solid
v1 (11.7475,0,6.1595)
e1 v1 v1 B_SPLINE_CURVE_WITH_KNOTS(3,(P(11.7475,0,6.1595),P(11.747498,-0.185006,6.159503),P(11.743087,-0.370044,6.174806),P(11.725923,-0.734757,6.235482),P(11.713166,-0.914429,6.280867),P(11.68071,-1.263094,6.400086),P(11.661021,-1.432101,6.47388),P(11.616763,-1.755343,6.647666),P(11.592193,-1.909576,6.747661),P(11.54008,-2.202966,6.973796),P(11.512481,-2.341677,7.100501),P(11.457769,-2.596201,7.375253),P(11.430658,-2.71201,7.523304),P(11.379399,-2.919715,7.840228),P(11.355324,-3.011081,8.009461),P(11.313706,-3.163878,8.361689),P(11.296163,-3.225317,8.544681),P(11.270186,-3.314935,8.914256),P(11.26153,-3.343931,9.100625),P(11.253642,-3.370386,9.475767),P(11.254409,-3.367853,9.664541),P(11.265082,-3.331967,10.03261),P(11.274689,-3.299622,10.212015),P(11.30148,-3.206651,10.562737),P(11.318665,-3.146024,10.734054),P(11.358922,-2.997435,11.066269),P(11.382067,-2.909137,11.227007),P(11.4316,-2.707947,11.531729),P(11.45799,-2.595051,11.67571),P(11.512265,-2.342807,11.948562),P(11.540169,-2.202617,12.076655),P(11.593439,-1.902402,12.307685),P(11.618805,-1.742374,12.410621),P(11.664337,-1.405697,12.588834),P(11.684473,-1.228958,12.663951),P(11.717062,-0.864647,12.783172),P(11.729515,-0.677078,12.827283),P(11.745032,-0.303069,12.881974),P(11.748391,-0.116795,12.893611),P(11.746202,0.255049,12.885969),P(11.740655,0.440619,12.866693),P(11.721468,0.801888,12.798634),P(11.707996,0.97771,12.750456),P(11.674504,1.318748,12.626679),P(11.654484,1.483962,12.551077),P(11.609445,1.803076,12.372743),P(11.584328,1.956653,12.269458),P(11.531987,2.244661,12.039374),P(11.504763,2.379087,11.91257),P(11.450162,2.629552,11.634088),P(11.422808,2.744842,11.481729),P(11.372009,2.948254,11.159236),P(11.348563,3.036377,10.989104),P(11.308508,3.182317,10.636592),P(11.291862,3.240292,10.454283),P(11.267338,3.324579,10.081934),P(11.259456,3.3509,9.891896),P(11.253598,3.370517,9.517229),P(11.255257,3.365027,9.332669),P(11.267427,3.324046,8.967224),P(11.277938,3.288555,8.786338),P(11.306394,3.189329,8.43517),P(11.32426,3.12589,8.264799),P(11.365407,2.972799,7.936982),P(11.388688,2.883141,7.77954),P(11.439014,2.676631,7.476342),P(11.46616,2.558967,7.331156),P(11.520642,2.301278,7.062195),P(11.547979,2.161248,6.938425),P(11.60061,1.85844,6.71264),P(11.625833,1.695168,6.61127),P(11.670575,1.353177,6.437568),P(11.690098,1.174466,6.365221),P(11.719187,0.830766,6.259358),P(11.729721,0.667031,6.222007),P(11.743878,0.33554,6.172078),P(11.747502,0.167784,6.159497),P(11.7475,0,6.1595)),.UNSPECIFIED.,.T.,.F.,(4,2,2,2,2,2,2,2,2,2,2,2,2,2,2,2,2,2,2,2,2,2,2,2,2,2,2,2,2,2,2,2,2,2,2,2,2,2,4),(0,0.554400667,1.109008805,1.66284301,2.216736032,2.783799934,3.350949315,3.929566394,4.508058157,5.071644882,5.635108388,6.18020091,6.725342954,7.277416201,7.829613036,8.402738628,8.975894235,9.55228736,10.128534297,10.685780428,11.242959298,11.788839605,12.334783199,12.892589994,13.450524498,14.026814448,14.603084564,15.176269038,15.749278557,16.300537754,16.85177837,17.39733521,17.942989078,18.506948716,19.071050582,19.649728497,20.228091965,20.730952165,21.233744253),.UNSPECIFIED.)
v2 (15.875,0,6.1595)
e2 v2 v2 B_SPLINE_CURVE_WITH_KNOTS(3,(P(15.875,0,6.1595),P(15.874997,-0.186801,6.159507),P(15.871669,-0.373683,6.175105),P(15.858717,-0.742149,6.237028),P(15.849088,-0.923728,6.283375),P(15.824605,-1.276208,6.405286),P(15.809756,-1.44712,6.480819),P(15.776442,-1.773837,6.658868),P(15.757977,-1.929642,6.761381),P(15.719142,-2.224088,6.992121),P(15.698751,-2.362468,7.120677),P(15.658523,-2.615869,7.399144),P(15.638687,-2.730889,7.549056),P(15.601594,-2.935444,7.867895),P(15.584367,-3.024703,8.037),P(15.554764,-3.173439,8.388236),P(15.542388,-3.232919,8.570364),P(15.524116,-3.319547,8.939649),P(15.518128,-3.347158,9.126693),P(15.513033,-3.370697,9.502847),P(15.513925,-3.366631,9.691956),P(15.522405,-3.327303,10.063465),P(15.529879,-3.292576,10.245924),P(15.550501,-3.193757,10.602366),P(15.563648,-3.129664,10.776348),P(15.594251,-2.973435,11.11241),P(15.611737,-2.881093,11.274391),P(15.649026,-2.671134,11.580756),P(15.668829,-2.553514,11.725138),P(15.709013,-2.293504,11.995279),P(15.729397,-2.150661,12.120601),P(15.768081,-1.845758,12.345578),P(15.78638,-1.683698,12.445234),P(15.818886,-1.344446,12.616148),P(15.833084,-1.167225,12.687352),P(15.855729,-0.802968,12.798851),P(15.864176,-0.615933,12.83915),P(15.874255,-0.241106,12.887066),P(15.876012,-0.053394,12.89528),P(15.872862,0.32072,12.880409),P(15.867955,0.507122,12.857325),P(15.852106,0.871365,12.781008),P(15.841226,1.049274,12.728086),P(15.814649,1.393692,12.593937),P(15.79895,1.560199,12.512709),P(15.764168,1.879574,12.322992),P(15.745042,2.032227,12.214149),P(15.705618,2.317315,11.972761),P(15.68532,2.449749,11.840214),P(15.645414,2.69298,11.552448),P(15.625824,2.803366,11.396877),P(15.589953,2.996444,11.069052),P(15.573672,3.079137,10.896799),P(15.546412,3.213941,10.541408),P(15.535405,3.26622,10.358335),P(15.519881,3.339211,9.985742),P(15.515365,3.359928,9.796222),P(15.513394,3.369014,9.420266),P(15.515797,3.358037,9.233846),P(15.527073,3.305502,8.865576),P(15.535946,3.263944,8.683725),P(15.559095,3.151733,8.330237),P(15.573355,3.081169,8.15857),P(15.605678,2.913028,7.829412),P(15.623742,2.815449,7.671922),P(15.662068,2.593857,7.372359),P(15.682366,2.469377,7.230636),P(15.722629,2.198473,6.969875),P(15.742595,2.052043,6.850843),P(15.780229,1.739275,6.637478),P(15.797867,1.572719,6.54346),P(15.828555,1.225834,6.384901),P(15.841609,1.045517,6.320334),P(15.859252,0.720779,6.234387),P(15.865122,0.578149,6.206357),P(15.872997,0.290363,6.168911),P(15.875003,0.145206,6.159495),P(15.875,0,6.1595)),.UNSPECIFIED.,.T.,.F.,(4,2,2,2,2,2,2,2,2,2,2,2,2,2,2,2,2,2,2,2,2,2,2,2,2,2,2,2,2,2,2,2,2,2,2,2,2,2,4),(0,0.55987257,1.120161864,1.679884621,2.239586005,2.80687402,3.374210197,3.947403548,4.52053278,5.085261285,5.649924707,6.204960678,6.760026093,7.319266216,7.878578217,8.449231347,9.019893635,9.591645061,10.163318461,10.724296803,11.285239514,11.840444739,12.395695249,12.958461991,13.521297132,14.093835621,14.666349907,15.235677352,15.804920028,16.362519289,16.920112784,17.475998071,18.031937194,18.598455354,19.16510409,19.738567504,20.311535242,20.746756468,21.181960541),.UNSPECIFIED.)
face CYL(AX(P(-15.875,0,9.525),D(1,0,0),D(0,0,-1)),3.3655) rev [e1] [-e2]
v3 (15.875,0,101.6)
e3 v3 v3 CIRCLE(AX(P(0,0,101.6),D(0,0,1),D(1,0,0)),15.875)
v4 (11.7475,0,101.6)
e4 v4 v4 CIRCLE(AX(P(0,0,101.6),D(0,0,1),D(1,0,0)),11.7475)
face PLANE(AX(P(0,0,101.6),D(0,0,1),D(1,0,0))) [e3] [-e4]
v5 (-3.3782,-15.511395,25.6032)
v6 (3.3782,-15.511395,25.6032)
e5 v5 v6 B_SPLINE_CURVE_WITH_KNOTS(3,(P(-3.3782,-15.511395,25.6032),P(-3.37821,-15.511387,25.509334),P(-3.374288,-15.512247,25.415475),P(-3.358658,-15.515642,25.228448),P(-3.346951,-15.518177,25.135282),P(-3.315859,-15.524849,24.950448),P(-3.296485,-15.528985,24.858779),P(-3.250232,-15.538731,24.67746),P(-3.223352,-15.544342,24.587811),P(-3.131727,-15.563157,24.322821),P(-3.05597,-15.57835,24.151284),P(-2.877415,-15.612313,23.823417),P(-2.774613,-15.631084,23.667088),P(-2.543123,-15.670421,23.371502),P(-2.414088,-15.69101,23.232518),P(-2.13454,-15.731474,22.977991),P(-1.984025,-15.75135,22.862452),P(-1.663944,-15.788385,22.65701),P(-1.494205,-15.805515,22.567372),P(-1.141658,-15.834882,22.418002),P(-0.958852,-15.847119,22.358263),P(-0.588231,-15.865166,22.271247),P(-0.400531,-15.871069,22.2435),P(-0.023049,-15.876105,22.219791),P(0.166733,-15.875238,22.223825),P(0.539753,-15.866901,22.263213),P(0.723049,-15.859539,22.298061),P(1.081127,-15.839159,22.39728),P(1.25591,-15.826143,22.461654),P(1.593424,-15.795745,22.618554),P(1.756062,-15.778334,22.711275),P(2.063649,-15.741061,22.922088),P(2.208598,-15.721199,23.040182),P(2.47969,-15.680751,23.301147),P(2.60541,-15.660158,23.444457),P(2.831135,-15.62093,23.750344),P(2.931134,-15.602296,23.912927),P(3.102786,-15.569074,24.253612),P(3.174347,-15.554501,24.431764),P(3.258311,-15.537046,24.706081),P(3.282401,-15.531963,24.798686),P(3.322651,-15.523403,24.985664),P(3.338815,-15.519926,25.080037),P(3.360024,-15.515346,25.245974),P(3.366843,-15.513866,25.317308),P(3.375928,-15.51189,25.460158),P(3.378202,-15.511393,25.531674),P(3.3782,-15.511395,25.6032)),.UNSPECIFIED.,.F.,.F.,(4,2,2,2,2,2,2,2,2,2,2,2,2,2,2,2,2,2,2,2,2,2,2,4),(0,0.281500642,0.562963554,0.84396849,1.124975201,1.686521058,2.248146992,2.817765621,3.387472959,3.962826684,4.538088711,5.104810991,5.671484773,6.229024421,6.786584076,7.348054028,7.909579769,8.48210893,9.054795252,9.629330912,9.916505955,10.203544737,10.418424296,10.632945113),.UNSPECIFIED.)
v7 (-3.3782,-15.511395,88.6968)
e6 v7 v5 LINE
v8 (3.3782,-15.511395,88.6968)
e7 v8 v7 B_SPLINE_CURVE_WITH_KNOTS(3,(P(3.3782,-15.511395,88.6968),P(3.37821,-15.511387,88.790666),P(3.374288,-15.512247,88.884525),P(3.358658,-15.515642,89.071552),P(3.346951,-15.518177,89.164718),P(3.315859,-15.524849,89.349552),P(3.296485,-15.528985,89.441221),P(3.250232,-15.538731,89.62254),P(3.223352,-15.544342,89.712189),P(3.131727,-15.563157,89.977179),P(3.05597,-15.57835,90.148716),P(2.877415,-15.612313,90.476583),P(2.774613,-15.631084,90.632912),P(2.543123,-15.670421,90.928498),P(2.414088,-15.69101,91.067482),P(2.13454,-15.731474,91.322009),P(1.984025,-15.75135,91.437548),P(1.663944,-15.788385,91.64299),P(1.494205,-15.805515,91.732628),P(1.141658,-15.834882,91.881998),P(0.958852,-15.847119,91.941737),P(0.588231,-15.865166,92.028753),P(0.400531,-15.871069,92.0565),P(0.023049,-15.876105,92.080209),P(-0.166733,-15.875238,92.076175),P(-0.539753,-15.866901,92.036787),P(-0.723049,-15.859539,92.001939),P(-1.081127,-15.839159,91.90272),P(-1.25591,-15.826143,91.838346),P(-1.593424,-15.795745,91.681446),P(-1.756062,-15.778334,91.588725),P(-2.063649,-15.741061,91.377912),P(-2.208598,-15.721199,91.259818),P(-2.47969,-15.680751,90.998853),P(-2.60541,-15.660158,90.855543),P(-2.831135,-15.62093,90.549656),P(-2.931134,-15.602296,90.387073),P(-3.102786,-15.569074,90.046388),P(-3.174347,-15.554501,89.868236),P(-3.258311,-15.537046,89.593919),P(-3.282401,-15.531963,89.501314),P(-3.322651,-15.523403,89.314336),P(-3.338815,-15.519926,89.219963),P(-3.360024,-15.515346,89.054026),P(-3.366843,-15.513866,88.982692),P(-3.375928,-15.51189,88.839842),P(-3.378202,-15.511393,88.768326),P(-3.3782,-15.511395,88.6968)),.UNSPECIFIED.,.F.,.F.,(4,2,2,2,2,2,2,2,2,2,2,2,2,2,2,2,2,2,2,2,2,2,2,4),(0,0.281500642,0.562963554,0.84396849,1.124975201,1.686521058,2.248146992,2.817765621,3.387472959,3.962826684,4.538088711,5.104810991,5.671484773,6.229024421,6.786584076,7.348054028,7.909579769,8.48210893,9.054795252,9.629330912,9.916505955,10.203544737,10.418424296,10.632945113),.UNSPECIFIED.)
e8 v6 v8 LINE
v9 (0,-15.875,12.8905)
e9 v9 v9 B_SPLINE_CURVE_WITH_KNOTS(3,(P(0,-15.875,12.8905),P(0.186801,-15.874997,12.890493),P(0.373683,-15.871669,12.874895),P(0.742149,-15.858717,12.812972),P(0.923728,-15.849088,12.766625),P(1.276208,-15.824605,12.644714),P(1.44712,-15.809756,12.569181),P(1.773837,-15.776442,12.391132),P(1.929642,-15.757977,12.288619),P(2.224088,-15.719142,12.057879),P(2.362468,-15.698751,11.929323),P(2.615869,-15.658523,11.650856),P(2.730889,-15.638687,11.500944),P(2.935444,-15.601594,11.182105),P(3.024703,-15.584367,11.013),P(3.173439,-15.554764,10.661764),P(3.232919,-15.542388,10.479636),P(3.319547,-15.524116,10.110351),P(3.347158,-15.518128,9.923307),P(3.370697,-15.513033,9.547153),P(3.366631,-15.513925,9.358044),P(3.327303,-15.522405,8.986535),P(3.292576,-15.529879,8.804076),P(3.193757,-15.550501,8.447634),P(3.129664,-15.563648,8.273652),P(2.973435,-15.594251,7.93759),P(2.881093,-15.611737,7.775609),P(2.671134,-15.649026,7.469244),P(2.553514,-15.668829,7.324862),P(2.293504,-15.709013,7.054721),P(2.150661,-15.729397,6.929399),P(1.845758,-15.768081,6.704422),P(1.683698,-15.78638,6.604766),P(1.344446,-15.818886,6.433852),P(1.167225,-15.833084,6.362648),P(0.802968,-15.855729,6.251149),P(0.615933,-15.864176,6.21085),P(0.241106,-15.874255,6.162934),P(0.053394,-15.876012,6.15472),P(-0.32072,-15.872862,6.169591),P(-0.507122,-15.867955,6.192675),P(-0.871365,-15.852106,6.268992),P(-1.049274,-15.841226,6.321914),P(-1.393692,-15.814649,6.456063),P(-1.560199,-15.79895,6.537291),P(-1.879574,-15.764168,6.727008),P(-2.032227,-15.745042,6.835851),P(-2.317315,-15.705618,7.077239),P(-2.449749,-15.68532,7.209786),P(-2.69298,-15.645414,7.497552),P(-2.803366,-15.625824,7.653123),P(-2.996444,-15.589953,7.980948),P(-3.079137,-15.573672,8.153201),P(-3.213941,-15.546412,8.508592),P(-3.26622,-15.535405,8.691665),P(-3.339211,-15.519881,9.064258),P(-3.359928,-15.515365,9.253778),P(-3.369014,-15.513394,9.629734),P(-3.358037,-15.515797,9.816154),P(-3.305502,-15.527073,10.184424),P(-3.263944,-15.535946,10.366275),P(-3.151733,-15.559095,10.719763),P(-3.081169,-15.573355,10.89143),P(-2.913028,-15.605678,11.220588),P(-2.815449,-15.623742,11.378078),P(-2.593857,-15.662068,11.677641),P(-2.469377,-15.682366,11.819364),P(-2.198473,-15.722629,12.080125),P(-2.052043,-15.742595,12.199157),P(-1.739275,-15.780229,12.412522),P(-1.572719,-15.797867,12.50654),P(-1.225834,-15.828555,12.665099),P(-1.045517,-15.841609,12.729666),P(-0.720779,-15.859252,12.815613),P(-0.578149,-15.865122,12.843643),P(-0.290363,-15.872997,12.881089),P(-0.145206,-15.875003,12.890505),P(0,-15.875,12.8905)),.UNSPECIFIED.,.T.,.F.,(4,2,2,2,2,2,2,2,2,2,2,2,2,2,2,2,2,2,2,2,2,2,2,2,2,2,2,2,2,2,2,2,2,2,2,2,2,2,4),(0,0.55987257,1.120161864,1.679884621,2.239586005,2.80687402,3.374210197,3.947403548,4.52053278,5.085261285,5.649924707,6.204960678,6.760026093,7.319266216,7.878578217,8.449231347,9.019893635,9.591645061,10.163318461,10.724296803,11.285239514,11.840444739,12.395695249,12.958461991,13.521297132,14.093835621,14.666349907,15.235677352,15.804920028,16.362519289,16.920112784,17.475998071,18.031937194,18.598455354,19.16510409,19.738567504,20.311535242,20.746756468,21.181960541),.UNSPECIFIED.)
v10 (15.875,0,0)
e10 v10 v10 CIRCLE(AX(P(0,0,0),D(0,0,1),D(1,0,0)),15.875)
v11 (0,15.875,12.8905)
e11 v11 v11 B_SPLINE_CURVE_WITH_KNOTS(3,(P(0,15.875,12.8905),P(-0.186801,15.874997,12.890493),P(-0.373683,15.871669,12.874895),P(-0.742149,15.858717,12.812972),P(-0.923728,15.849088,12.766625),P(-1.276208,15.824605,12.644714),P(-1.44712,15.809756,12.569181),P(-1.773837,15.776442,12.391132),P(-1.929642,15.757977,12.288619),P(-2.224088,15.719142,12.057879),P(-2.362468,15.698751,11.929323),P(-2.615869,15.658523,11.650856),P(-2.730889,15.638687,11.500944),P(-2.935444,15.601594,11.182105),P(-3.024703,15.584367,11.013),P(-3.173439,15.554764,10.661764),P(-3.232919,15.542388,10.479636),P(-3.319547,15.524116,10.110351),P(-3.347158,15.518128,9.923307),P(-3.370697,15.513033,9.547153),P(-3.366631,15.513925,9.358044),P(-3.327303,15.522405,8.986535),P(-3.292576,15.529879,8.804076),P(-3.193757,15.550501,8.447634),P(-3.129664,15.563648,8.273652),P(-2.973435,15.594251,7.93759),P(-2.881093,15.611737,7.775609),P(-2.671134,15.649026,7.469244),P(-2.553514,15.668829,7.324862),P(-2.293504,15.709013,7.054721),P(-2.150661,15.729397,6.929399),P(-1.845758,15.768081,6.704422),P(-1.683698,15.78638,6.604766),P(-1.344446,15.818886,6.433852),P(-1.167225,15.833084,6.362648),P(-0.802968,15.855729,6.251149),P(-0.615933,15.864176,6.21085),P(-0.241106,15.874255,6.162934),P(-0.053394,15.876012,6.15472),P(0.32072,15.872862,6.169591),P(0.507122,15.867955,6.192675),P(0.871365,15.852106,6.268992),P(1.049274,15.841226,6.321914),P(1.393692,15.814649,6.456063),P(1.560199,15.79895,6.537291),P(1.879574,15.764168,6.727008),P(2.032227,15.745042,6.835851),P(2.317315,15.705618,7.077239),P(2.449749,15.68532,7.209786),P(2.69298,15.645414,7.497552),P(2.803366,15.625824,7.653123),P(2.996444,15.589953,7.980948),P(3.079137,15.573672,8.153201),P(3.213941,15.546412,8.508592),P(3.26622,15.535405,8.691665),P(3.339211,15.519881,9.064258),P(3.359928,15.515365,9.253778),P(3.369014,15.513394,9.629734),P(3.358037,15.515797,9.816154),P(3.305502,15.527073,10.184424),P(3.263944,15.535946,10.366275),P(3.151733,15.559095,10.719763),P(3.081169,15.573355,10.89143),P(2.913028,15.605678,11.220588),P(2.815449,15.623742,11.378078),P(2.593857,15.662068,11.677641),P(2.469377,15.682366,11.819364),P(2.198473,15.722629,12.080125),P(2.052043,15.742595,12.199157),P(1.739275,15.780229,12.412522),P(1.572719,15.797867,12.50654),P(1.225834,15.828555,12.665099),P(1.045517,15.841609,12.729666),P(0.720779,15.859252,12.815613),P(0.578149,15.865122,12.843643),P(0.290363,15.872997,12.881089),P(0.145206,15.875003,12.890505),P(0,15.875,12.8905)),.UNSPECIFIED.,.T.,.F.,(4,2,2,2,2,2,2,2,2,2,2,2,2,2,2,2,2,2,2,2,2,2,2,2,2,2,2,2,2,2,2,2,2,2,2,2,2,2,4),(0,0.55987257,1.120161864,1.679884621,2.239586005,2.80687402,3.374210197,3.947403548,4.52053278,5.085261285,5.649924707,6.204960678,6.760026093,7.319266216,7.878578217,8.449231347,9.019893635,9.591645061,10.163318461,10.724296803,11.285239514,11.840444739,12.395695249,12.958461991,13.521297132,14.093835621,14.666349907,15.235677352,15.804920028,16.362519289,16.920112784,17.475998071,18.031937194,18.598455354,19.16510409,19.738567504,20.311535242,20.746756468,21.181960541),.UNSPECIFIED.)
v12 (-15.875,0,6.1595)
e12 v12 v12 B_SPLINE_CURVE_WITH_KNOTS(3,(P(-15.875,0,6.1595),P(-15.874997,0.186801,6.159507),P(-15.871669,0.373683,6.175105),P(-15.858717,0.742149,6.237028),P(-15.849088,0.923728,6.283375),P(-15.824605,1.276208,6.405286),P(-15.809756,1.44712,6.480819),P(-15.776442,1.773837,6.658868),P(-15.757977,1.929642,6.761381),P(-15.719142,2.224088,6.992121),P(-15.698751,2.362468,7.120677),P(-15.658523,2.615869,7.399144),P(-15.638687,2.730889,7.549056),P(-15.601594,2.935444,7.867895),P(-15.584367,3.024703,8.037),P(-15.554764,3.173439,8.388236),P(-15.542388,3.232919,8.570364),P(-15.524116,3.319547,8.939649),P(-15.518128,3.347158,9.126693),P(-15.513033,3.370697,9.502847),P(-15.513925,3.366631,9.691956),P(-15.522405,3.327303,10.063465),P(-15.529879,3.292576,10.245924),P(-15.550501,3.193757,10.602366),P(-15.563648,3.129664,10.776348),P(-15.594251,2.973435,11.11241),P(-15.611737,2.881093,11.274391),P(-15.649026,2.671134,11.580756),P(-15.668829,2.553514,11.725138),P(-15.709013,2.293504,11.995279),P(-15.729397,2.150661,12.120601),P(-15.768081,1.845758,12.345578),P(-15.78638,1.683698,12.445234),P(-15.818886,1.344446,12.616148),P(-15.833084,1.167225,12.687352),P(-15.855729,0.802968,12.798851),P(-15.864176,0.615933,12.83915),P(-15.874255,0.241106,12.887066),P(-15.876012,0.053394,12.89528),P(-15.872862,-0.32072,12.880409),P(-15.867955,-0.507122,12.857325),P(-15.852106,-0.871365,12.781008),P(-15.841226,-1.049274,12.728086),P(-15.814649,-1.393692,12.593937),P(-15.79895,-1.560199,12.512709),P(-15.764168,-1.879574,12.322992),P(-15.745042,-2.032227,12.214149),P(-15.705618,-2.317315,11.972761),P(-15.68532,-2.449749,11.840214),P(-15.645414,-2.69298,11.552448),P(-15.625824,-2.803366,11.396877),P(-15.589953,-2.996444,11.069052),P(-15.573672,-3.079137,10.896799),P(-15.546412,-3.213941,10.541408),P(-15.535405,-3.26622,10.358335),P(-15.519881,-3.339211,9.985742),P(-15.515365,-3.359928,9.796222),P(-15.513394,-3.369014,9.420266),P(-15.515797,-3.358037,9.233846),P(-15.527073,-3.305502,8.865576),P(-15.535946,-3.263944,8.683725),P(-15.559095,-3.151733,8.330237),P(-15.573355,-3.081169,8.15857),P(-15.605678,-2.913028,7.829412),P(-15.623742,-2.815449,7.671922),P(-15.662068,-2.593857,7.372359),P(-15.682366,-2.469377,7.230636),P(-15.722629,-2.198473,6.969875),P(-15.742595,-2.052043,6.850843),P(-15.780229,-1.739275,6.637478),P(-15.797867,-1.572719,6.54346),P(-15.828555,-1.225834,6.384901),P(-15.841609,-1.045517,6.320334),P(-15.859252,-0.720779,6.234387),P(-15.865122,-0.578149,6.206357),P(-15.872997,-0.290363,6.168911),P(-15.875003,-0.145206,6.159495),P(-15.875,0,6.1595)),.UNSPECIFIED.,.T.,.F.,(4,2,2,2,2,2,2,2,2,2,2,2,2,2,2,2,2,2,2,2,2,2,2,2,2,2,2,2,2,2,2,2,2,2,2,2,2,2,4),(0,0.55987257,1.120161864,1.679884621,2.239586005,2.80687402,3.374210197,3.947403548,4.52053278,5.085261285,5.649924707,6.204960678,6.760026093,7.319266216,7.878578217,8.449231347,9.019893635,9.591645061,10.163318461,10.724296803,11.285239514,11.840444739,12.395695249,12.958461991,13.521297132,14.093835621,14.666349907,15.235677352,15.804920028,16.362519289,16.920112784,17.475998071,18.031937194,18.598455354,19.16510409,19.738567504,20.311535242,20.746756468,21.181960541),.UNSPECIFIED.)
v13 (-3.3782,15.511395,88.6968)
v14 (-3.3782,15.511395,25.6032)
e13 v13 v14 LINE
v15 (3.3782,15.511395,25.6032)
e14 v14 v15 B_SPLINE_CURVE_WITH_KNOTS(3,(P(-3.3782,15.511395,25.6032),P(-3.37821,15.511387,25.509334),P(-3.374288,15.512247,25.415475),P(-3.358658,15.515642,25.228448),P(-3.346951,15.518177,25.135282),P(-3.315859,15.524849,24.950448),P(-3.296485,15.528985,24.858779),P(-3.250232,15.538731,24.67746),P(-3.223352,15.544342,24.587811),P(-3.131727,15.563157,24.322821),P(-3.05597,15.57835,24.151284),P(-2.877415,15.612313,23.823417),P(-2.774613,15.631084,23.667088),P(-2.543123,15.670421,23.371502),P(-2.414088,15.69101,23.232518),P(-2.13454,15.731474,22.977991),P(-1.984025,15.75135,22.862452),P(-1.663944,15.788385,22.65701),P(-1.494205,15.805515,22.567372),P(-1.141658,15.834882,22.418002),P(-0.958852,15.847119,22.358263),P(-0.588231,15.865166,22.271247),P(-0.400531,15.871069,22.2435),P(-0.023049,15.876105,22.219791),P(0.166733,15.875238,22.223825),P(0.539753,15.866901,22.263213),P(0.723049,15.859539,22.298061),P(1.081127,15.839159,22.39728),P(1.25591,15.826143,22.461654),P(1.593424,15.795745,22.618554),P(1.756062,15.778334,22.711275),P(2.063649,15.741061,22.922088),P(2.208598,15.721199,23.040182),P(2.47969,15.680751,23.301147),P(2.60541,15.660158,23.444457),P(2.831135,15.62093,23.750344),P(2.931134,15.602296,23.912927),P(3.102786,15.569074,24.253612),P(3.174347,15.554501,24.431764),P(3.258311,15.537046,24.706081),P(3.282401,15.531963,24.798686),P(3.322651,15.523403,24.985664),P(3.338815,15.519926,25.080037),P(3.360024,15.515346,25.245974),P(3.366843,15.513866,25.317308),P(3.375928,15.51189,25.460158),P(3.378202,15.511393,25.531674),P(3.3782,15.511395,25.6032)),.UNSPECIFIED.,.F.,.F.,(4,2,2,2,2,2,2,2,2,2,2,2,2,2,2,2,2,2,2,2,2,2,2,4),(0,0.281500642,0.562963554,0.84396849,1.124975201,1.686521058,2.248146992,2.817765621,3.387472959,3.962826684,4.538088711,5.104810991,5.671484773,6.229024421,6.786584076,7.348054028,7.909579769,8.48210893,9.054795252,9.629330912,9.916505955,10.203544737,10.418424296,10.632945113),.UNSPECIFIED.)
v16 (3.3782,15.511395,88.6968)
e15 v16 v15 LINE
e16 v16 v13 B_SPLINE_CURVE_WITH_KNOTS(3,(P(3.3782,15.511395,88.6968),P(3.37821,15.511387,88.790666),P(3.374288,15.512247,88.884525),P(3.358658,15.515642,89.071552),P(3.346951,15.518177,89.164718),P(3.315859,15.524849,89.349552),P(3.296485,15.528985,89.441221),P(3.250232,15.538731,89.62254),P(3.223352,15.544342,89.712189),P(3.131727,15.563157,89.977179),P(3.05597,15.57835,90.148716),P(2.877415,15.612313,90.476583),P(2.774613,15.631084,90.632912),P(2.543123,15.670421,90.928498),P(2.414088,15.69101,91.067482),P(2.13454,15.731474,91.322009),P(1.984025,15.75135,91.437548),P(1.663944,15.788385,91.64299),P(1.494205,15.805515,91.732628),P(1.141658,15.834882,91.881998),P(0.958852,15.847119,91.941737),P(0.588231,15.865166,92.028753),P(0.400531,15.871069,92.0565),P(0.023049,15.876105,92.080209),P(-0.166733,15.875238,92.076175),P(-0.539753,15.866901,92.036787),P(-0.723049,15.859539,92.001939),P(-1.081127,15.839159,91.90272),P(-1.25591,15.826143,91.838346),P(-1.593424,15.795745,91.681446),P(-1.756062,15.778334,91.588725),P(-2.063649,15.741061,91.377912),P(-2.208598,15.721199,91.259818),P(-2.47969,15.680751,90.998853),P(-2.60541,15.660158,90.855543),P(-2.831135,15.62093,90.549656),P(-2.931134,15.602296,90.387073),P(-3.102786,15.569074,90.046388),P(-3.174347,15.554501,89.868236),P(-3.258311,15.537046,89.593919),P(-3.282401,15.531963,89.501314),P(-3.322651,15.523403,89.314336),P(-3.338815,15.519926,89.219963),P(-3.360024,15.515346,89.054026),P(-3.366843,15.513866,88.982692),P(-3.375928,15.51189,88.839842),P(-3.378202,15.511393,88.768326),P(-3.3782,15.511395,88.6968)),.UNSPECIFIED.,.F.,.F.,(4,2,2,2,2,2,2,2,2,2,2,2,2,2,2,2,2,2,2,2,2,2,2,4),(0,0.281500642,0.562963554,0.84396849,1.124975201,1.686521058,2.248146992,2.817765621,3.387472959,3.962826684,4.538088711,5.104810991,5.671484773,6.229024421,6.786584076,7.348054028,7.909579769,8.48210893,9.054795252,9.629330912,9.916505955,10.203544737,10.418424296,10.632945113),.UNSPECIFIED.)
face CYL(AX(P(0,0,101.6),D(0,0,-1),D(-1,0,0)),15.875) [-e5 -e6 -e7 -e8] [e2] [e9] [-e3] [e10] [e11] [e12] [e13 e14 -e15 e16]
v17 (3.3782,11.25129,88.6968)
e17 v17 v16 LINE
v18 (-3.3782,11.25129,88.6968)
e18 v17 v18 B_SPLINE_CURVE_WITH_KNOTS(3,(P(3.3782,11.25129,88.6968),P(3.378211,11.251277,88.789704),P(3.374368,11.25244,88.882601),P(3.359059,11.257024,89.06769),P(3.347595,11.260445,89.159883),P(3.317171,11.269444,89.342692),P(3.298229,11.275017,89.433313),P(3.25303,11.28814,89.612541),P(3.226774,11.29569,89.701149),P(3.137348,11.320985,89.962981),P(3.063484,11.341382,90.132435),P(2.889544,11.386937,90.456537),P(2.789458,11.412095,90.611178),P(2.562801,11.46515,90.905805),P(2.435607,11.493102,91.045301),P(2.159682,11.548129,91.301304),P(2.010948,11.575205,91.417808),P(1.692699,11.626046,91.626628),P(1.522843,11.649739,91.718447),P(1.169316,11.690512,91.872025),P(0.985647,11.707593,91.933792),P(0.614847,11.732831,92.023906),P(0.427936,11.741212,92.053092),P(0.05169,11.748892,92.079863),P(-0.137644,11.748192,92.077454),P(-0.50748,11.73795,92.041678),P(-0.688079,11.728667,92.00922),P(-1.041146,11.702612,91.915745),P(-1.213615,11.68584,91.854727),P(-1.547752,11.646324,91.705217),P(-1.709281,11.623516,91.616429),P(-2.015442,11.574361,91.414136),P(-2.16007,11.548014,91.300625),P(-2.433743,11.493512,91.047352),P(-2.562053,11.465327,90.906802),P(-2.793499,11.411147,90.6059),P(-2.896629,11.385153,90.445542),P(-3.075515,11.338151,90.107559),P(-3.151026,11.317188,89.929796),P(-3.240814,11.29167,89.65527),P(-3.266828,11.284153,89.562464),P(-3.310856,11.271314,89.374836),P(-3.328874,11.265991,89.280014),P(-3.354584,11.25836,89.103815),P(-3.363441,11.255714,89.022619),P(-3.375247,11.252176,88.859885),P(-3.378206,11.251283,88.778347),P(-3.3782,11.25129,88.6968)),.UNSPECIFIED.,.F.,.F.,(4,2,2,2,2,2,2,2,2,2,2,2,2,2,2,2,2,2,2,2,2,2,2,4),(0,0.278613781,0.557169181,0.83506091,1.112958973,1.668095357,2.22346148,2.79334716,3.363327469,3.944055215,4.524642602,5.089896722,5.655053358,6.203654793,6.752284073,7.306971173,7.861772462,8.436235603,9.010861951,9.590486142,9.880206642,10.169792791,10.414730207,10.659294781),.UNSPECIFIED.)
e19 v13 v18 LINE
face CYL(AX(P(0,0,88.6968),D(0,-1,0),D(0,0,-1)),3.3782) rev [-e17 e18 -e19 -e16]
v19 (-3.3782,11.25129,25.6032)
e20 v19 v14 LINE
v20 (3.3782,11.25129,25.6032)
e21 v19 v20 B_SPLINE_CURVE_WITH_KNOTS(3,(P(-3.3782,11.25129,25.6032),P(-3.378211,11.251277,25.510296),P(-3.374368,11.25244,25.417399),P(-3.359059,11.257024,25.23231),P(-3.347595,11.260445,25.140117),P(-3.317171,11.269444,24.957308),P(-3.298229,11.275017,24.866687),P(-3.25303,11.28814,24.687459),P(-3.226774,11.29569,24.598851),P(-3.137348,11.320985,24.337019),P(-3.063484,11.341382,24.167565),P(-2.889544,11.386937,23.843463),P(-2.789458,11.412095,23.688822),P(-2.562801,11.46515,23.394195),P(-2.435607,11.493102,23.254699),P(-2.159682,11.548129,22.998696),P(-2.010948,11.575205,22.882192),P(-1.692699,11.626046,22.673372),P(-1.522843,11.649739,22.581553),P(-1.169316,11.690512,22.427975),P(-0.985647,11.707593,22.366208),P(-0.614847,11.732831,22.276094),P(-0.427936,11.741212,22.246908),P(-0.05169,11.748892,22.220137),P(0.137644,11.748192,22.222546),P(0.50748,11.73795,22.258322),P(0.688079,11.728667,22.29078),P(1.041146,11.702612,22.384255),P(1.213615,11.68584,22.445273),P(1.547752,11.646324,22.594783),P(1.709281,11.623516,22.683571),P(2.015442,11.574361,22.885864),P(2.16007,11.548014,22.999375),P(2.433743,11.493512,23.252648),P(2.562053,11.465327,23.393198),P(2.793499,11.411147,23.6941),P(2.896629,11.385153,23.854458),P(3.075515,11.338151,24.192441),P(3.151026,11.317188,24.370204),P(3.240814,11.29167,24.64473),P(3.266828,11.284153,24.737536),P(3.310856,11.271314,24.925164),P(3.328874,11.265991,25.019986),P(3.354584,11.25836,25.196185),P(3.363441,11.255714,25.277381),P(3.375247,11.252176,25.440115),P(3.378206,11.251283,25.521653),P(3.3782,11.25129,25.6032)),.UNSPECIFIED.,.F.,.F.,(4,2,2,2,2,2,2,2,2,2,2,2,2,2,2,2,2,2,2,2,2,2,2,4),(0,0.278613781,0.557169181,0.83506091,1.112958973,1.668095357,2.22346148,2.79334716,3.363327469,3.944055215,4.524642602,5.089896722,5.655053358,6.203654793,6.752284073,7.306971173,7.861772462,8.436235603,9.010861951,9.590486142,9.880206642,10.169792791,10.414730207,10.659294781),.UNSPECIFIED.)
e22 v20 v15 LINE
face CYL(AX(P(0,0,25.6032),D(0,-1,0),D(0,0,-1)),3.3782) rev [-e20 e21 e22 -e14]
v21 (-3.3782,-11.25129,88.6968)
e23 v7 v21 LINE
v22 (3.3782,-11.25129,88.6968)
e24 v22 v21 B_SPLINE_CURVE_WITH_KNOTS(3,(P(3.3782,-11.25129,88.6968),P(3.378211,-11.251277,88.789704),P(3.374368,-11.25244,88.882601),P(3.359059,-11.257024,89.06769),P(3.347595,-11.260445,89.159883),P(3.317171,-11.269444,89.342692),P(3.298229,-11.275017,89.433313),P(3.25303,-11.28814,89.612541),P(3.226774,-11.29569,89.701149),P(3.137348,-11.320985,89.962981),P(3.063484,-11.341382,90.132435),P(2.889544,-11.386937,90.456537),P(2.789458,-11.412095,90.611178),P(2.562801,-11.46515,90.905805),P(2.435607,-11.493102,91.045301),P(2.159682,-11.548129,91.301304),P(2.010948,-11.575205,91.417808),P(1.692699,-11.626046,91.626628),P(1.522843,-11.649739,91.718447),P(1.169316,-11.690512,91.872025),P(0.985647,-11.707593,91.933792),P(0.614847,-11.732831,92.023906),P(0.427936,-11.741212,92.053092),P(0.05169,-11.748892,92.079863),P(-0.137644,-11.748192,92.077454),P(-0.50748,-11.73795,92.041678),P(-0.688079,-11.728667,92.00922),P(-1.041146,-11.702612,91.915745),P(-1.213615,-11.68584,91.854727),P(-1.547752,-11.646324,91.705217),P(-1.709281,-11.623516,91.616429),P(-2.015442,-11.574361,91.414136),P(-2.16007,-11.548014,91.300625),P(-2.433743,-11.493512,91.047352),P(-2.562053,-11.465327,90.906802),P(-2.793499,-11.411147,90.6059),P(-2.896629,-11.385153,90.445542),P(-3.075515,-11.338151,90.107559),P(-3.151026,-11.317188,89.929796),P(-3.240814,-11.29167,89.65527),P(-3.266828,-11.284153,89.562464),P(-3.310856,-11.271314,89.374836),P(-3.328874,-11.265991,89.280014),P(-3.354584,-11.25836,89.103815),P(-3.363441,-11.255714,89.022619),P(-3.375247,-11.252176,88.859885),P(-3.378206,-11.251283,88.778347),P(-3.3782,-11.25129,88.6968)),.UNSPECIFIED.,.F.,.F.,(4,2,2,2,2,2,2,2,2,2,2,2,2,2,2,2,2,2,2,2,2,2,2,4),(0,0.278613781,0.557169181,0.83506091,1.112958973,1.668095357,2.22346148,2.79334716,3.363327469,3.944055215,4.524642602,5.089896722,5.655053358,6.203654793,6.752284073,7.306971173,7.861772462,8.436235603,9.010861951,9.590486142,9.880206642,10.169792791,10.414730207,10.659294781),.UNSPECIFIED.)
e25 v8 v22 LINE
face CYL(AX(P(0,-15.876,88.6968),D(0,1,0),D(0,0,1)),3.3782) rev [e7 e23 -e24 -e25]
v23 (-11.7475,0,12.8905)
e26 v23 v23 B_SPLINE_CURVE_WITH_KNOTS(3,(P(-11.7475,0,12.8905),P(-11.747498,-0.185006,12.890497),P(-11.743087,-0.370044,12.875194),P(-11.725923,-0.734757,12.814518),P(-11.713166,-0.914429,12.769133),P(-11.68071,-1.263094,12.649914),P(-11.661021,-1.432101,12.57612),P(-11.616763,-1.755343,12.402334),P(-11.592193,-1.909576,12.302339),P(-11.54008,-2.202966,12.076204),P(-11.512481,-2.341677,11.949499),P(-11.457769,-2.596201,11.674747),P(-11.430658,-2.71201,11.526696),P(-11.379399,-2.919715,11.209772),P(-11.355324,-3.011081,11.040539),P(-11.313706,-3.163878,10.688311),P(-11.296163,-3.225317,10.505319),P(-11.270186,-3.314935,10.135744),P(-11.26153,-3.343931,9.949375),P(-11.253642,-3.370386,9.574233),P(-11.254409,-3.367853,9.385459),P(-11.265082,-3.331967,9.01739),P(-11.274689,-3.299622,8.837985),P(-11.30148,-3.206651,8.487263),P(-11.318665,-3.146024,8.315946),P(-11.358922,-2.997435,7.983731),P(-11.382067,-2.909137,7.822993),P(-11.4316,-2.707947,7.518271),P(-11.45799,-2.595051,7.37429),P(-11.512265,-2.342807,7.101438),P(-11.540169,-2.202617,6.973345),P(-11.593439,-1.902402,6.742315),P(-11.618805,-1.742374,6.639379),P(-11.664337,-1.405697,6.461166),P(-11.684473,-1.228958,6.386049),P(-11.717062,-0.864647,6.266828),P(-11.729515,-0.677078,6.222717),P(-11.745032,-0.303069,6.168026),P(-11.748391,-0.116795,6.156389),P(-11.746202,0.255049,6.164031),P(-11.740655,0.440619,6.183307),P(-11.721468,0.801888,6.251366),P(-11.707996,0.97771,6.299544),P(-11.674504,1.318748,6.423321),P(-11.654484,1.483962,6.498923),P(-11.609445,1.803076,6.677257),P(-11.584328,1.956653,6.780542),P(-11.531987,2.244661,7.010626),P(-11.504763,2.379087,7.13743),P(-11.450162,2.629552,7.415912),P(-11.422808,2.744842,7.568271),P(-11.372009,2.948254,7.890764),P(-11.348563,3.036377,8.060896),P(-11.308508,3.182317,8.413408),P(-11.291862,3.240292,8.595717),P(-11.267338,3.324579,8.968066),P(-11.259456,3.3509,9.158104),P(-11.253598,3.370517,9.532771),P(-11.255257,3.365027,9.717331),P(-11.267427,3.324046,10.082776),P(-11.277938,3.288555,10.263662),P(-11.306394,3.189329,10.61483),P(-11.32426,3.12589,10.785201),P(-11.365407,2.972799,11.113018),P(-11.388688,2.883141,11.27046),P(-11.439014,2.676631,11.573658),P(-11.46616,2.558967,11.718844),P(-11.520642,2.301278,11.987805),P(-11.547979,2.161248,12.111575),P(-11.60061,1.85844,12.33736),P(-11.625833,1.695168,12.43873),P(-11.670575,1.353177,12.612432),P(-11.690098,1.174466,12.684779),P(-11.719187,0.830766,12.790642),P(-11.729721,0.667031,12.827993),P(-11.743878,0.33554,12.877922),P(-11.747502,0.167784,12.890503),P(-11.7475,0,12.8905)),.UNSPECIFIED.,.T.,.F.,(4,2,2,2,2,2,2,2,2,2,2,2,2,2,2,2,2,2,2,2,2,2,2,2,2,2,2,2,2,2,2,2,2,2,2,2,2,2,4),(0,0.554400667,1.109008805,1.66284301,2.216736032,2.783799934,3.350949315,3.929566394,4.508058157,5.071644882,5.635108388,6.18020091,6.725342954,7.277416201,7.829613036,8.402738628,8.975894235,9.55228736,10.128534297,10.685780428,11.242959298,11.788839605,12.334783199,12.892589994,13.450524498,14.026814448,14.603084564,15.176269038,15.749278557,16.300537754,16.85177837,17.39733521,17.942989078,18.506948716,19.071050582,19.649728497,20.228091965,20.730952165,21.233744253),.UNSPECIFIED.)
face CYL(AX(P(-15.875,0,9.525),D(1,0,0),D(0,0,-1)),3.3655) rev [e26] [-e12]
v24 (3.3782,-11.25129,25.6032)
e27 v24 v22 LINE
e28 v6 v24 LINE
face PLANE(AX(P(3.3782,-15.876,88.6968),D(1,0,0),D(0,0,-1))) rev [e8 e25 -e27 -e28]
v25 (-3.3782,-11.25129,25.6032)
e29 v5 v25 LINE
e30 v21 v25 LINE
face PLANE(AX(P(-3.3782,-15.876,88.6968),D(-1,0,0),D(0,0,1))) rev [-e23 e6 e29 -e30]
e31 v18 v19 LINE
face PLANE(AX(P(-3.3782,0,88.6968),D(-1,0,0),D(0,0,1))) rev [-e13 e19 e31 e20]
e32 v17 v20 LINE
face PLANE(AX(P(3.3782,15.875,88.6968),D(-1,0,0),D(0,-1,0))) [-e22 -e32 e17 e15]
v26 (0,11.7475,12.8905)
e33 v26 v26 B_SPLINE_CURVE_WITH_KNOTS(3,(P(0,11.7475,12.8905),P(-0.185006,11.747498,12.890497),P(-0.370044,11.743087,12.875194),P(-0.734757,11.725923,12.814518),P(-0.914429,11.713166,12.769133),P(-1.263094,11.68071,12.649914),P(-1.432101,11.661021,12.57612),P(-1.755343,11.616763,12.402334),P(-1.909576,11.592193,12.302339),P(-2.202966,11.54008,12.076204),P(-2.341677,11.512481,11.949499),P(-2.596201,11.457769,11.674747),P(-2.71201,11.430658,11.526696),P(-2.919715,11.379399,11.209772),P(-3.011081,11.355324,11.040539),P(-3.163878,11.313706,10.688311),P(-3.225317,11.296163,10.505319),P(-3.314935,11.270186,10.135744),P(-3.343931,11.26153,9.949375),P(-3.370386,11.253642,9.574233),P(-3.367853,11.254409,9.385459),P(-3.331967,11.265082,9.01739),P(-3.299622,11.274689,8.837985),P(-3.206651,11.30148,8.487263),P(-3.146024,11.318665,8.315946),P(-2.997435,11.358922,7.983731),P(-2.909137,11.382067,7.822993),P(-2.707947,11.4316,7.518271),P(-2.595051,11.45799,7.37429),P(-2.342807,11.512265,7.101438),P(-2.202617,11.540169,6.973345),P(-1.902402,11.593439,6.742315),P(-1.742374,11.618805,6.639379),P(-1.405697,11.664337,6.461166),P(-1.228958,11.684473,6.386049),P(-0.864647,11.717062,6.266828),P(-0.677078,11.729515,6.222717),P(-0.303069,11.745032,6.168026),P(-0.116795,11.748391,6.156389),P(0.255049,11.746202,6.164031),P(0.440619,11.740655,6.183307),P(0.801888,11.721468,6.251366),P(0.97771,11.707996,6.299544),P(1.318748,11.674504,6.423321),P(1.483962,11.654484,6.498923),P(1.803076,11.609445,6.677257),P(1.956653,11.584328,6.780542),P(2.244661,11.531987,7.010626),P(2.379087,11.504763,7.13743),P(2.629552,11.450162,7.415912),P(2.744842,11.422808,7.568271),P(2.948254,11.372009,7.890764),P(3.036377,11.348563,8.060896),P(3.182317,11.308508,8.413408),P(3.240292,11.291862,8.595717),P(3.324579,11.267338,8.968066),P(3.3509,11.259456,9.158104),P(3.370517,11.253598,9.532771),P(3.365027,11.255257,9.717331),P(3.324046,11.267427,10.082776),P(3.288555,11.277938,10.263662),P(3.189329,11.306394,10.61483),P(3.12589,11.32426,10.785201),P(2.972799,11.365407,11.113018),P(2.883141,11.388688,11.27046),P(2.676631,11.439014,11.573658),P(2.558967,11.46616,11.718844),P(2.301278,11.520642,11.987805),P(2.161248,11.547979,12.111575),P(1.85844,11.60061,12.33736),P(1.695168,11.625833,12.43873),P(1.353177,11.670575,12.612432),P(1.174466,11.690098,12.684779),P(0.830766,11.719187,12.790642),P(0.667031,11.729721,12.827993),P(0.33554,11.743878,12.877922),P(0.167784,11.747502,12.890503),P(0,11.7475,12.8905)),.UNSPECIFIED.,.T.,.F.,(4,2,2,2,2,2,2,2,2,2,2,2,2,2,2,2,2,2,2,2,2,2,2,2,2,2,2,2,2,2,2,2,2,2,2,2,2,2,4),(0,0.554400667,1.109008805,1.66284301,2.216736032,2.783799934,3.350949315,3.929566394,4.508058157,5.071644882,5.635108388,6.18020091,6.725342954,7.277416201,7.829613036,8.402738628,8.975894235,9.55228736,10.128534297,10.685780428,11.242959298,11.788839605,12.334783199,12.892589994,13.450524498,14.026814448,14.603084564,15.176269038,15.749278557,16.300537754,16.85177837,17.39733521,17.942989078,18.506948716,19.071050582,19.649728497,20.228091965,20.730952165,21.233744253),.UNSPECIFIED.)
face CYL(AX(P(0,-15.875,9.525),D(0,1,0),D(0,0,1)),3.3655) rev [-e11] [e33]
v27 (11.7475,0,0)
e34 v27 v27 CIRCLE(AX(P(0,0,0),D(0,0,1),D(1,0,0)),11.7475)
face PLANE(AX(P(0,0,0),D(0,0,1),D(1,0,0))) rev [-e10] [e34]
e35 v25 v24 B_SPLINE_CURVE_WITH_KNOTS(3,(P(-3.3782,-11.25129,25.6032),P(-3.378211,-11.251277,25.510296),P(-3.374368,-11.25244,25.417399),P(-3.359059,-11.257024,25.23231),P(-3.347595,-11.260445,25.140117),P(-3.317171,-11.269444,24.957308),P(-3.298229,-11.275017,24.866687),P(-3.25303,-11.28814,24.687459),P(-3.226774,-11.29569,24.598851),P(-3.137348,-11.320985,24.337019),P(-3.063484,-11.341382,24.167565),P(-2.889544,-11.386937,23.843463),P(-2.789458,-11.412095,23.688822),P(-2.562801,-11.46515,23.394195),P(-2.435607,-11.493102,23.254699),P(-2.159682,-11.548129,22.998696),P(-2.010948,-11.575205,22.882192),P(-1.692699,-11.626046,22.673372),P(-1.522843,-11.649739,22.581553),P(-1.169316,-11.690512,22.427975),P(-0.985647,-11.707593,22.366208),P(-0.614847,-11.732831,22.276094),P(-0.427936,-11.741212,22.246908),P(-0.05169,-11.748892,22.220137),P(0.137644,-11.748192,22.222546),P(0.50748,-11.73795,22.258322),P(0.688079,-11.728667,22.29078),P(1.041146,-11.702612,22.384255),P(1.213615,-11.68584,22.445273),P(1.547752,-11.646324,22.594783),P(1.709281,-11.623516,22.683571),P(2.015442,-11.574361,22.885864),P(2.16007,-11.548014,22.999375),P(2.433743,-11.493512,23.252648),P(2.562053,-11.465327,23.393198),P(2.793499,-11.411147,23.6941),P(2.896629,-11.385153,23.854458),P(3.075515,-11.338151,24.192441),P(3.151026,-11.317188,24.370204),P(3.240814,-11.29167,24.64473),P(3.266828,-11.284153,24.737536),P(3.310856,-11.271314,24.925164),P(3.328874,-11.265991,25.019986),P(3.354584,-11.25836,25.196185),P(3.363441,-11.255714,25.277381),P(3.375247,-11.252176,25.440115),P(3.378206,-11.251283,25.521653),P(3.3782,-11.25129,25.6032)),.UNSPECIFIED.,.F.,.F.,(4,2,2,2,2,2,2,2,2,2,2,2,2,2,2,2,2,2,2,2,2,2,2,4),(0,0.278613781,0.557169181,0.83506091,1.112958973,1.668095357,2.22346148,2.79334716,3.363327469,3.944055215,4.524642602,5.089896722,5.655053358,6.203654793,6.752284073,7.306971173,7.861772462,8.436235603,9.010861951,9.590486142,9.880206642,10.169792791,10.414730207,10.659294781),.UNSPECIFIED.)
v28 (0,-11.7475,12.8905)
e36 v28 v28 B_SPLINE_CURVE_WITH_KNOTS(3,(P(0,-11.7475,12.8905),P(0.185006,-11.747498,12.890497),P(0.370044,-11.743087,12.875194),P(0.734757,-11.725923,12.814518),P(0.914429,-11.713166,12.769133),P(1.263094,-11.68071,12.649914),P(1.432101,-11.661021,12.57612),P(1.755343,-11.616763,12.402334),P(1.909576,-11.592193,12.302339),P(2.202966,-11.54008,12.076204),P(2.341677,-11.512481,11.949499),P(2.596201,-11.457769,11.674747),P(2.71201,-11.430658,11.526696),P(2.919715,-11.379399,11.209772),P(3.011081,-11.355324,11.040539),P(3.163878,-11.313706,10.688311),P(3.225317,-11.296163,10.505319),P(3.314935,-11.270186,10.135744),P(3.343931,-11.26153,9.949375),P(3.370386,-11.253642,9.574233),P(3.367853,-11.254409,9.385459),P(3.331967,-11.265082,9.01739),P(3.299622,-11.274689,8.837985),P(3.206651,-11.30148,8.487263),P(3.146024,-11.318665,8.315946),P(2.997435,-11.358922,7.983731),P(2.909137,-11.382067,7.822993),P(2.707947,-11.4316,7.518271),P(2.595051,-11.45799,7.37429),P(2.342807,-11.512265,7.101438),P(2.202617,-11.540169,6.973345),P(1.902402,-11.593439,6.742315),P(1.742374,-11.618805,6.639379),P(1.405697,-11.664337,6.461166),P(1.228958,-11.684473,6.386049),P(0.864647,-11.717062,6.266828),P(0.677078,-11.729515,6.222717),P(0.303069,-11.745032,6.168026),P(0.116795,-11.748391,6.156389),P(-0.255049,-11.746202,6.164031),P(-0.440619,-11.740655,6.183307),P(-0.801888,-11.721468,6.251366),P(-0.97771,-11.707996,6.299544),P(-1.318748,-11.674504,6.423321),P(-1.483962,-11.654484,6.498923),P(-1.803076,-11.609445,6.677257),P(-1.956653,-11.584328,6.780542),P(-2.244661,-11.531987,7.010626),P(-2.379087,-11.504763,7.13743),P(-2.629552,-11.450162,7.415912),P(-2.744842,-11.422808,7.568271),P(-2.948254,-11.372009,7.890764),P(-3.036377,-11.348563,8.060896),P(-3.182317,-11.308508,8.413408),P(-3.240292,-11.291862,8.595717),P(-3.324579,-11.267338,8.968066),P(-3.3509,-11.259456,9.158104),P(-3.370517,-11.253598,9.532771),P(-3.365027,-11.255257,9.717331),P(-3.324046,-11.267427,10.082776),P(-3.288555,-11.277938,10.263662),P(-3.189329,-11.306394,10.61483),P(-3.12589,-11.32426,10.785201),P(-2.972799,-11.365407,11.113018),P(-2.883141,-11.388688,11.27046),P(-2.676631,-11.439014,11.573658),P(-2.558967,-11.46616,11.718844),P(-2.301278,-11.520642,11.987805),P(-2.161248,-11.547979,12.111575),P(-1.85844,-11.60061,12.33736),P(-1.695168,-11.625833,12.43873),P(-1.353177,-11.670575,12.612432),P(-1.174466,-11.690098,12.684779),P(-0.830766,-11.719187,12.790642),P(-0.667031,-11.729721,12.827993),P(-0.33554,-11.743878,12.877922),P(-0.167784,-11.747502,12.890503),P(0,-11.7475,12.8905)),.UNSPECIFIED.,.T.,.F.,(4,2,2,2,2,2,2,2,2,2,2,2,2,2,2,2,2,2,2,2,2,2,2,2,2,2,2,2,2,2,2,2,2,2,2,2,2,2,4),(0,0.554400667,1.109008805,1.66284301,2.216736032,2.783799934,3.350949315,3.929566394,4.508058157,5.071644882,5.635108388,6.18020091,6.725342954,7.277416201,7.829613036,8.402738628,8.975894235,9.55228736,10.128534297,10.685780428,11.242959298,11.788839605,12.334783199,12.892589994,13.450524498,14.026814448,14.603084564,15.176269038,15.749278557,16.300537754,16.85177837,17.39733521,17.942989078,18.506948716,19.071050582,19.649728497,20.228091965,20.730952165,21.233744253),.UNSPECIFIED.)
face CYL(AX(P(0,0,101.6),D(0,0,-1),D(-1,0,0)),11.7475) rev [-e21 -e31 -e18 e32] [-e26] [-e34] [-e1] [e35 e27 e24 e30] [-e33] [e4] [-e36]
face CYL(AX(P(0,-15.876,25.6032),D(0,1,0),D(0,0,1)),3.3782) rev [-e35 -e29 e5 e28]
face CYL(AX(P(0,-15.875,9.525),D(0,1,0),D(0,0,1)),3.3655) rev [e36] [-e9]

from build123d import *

# Parameters (mm, degrees)
SKETCH1_R                   = 15.875
SKETCH1_R_2                 = 11.7475
BOSS_EXTRUDE1_DEPTH         = 101.6
F_1_4_START                 = 10
F_1_4_CLEARANCE_SLOT1_DEPTH = 7
CUT_EXTRUDE1_REACH          = 106.051
CUT_EXTRUDE1_END_RADIUS     = 15.875
CUT_EXTRUDE2_DEPTH          = 105.050907141
CUT_EXTRUDE2_DEPTH_BACK     = 105.050907141
SKETCH5_R                   = 3.3655
CUT_EXTRUDE3_DEPTH          = 105.050907141
CUT_EXTRUDE3_DEPTH_BACK     = 105.050907141
SKETCH6_R                   = 3.3655


with BuildPart() as part:
    # Sketch1 → Boss-Extrude1 (new body)
    with BuildSketch(Plane.XY):
        Circle(SKETCH1_R)
        Circle(SKETCH1_R_2, mode=Mode.SUBTRACT)
    extrude(amount=BOSS_EXTRUDE1_DEPTH)

    # 1/4 Clearance Slot1: read off the stored shape, not the designer's step
    # 1/4 Clearance Slot1 outline → 1/4 Clearance Slot1 (cut)
    with BuildSketch(Plane(origin=(0, 0, 0), x_dir=(1, 0, 0), z_dir=(0, 1, 0)).offset(F_1_4_START)):
        with BuildLine():
            Line((3.3782, -88.6968), (3.3782, -25.6032))
            ThreePointArc((3.3782, -25.6032), (0, -22.225), (-3.3782, -25.6032))
            Line((-3.3782, -25.6032), (-3.3782, -88.6968))
            ThreePointArc((-3.3782, -88.6968), (0, -92.075), (3.3782, -88.6968))
        make_face()
    extrude(amount=F_1_4_CLEARANCE_SLOT1_DEPTH, mode=Mode.SUBTRACT)

    # Cut-Extrude1: up to this cylinder (the profile starts inside it)
    cut_extrude1_end = Plane(origin=(0, 0, 57.15), z_dir=(0, 0, -1)) * Cylinder(CUT_EXTRUDE1_END_RADIUS, 244.852, mode=Mode.PRIVATE)
    # Sketch4 → Cut-Extrude1 (cut, up to the surface)
    with BuildSketch(Plane(origin=(0, 0, 0), x_dir=(1, 0, 0), z_dir=(0, 1, 0)), mode=Mode.PRIVATE) as cut_extrude1_sk1:
        with BuildLine():
            Line((-3.3782, -88.6968), (-3.3782, -25.6032))
            ThreePointArc((-3.3782, -25.6032), (0, -22.225), (3.3782, -25.6032))
            Line((3.3782, -25.6032), (3.3782, -88.6968))
            ThreePointArc((3.3782, -88.6968), (0, -92.075), (-3.3782, -88.6968))
        make_face()
    cut_extrude1_tool1 = extrude(cut_extrude1_sk1.sketch, amount=-CUT_EXTRUDE1_REACH, mode=Mode.PRIVATE) & cut_extrude1_end
    add(cut_extrude1_tool1.solids().sort_by_distance((0, 0, 57.15))[0], mode=Mode.SUBTRACT)

    # Sketch5 → Cut-Extrude2 (cut, two sides: drawn at the far end of the back side and taken through both)
    with BuildSketch(Plane(origin=(0, 0, 0), x_dir=(1, 0, 0), z_dir=(0, 1, 0)).offset(-CUT_EXTRUDE2_DEPTH_BACK)):
        with Locations(Location((0, -9.525, 0), (0, 0, 270))):
            Circle(SKETCH5_R)
    extrude(amount=CUT_EXTRUDE2_DEPTH + CUT_EXTRUDE2_DEPTH_BACK, mode=Mode.SUBTRACT)

    # Sketch6 → Cut-Extrude3 (cut, two sides: drawn at the far end of the back side and taken through both)
    with BuildSketch(Plane(origin=(0, 0, 0), x_dir=(0, 0, -1), z_dir=(1, 0, 0)).offset(-CUT_EXTRUDE3_DEPTH_BACK)):
        with Locations((-9.525, 0)):
            Circle(SKETCH6_R)
    extrude(amount=CUT_EXTRUDE3_DEPTH + CUT_EXTRUDE3_DEPTH_BACK, mode=Mode.SUBTRACT)


solid = part.part
